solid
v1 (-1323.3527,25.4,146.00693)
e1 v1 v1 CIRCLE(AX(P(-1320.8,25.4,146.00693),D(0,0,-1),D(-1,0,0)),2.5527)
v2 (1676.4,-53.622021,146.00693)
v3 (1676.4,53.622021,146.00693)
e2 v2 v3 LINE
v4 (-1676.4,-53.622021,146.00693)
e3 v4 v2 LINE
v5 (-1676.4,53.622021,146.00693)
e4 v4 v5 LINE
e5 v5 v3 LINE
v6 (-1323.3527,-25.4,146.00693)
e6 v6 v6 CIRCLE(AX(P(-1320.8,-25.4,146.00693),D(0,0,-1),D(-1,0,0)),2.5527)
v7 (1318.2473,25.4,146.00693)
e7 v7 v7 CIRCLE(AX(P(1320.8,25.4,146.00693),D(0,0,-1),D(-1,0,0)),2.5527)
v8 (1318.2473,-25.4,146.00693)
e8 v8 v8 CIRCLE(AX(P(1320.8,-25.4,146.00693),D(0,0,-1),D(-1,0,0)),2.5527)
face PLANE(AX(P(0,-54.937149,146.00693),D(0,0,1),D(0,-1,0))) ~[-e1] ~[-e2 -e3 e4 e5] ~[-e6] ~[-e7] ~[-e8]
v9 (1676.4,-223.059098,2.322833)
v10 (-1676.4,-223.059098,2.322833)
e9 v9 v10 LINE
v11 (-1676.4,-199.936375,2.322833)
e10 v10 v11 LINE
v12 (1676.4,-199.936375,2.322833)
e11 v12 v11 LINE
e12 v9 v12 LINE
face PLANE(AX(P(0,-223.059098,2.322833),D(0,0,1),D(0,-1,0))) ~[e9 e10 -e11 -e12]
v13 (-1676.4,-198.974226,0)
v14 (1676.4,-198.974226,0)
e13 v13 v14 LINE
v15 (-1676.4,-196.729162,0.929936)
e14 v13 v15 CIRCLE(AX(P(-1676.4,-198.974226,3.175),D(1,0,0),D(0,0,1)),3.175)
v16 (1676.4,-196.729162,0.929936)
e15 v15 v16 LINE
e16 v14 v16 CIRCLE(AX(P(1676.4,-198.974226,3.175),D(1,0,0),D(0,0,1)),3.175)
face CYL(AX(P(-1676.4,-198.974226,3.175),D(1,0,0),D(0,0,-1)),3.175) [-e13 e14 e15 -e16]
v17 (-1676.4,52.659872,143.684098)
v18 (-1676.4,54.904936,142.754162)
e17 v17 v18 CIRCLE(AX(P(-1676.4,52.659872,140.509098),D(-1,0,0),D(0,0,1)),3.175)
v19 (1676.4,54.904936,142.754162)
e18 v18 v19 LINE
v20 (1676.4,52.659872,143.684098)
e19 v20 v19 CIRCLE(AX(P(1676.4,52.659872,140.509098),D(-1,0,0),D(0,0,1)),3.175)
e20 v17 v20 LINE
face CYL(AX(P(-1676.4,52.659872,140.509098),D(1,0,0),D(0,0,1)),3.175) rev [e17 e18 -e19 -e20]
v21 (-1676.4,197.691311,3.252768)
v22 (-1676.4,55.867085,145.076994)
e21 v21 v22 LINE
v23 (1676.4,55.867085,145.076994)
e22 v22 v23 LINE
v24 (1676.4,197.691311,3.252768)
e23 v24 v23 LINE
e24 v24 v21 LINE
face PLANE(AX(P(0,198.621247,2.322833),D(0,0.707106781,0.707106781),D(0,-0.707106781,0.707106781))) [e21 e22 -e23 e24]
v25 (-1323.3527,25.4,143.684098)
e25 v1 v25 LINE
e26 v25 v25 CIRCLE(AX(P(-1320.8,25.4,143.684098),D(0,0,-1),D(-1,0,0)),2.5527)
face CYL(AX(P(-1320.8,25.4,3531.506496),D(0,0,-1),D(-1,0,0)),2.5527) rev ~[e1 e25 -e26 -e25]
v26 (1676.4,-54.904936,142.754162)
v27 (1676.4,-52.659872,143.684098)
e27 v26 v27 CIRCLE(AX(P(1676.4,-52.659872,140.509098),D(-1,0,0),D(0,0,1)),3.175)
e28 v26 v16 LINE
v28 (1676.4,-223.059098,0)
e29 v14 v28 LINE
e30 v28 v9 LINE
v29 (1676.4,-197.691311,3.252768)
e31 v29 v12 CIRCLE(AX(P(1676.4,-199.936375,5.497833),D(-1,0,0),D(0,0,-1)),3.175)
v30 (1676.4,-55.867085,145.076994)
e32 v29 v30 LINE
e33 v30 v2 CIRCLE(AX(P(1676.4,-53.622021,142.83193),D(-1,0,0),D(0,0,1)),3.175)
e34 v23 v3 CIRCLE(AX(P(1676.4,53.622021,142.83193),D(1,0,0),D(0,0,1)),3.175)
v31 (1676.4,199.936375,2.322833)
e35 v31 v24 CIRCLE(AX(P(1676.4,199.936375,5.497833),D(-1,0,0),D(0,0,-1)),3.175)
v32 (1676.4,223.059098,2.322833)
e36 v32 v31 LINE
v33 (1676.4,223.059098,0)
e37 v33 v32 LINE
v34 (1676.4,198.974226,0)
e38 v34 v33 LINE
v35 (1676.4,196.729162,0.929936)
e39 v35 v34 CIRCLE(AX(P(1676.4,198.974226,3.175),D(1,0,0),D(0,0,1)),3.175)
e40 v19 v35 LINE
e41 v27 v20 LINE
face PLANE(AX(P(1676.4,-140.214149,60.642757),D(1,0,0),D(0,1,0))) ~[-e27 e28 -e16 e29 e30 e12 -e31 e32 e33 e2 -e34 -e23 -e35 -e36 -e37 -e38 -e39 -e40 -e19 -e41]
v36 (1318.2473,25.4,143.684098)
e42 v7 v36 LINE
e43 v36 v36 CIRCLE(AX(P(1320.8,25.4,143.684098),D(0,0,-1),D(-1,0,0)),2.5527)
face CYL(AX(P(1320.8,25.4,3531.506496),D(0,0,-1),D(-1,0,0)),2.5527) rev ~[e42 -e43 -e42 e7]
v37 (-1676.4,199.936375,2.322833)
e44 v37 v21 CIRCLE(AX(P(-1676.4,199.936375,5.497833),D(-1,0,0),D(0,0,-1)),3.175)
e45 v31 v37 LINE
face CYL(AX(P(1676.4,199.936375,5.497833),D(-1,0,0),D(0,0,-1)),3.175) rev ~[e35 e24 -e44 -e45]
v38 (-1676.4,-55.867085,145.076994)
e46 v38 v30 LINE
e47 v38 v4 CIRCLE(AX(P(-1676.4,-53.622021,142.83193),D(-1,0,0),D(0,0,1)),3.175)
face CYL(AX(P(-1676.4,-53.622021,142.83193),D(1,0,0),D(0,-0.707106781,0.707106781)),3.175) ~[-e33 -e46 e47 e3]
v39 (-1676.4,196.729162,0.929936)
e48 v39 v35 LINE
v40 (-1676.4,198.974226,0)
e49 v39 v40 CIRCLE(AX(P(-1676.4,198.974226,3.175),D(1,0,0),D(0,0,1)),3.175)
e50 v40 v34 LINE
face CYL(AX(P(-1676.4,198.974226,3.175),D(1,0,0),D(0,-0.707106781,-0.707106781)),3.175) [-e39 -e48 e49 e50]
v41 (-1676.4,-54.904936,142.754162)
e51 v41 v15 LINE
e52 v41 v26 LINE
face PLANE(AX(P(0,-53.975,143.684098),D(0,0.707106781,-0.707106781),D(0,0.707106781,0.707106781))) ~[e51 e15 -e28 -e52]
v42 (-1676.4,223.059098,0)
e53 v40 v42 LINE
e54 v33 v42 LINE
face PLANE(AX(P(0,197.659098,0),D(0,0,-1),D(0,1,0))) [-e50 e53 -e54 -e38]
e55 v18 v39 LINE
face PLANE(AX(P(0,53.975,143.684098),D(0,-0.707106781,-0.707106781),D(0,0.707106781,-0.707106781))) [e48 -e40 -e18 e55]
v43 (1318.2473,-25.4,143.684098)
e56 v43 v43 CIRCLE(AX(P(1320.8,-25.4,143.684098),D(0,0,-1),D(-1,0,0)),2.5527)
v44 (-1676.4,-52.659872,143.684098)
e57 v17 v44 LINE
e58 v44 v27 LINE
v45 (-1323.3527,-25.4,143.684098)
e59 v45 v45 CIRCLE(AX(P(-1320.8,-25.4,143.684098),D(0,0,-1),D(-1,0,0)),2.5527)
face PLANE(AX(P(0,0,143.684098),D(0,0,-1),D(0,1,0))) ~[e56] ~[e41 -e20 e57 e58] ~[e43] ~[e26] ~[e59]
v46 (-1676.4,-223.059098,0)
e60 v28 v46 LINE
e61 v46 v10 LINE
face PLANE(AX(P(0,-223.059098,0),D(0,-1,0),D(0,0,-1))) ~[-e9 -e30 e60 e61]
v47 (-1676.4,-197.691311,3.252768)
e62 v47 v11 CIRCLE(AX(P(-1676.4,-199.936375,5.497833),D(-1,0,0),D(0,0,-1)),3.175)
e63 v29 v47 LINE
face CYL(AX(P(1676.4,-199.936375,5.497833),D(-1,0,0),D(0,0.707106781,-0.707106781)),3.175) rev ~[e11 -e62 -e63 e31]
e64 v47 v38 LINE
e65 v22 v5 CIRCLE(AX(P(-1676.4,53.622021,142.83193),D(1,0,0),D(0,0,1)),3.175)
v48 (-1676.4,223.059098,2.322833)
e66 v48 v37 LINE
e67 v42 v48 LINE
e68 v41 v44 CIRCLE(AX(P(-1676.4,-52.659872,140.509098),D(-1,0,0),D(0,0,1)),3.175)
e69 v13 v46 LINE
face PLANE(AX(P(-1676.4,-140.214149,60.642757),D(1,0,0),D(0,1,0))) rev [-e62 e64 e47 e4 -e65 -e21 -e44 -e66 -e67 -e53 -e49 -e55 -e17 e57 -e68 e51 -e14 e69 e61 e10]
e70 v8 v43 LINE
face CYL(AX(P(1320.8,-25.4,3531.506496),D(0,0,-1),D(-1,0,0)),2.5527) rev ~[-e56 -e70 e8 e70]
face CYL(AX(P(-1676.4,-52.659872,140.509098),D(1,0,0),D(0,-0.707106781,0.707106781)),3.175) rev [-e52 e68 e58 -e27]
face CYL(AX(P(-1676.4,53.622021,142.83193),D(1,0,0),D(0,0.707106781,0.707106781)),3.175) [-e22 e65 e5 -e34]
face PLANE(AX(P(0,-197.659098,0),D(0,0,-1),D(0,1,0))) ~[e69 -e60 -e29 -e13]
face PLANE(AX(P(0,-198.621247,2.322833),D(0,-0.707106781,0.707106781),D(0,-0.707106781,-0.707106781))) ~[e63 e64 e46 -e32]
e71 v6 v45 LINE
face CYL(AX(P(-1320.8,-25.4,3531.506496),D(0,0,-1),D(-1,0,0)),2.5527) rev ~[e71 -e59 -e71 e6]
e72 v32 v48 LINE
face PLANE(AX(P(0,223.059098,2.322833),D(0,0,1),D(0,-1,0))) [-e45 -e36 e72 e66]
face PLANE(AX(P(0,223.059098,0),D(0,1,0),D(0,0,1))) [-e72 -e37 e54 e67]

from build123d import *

# Parameters (mm, degrees)
F1_DEPTH = 1676.4
F3_R     = 3.175
F4_R     = 3.175
F6_D     = 5.1054


with BuildPart() as f1:
    # F0 (on Right) → F1 (new body, symmetric)
    with BuildSketch(Plane.YZ):
        Polygon((198.6212466711, 2.3228325226), (64.5779461899, 136.3661330038), (62.9354555616, 134.7236423755), (197.6590979371, 0), (223.0590979371, 0), (223.0590979371, 2.3228325226), align=None)
        Polygon((54.937148734, 146.0069304597), (0, 146.0069304597), (0, 143.6840979371), (53.975, 143.6840979371), (62.9354555616, 134.7236423755), (64.5779461899, 136.3661330038), align=None)
    extrude(amount=F1_DEPTH, both=True)

    # F2: F1 across face


with BuildPart() as f1_1:
    add(f1.part)
    add(f1.part.mirror(Plane(origin=(0, 0, 144.8455141984), x_dir=(1, 0, 0), z_dir=(0, -1, 0))))

    # F3
    f3_edges = [f1_1.edges().sort_by_distance(p)[0] for p in [
        (0, -54.937149, 146.00693),
        (0, -198.621247, 2.322833),
        (0, 54.937149, 146.00693),
        (0, 198.621247, 2.322833),
        (0, -197.659098, 0),
        (0, 197.659098, 0),
    ]]
    fillet(f3_edges, radius=F3_R)

    # F4
    f4_edges = [f1_1.edges().sort_by_distance(p)[0] for p in [
        (0, -53.975, 143.684098),
        (0, 53.975, 143.684098),
    ]]
    fillet(f4_edges, radius=F4_R)

    # F6 (through all)
    with Locations(Plane.XY.offset(146.0069304597)):
        with Locations((-1320.8, 25.4), (-1320.8, -25.4), (1320.8, 25.4), (1320.8, -25.4)):
            Hole(F6_D / 2)


solid = f1_1.part
